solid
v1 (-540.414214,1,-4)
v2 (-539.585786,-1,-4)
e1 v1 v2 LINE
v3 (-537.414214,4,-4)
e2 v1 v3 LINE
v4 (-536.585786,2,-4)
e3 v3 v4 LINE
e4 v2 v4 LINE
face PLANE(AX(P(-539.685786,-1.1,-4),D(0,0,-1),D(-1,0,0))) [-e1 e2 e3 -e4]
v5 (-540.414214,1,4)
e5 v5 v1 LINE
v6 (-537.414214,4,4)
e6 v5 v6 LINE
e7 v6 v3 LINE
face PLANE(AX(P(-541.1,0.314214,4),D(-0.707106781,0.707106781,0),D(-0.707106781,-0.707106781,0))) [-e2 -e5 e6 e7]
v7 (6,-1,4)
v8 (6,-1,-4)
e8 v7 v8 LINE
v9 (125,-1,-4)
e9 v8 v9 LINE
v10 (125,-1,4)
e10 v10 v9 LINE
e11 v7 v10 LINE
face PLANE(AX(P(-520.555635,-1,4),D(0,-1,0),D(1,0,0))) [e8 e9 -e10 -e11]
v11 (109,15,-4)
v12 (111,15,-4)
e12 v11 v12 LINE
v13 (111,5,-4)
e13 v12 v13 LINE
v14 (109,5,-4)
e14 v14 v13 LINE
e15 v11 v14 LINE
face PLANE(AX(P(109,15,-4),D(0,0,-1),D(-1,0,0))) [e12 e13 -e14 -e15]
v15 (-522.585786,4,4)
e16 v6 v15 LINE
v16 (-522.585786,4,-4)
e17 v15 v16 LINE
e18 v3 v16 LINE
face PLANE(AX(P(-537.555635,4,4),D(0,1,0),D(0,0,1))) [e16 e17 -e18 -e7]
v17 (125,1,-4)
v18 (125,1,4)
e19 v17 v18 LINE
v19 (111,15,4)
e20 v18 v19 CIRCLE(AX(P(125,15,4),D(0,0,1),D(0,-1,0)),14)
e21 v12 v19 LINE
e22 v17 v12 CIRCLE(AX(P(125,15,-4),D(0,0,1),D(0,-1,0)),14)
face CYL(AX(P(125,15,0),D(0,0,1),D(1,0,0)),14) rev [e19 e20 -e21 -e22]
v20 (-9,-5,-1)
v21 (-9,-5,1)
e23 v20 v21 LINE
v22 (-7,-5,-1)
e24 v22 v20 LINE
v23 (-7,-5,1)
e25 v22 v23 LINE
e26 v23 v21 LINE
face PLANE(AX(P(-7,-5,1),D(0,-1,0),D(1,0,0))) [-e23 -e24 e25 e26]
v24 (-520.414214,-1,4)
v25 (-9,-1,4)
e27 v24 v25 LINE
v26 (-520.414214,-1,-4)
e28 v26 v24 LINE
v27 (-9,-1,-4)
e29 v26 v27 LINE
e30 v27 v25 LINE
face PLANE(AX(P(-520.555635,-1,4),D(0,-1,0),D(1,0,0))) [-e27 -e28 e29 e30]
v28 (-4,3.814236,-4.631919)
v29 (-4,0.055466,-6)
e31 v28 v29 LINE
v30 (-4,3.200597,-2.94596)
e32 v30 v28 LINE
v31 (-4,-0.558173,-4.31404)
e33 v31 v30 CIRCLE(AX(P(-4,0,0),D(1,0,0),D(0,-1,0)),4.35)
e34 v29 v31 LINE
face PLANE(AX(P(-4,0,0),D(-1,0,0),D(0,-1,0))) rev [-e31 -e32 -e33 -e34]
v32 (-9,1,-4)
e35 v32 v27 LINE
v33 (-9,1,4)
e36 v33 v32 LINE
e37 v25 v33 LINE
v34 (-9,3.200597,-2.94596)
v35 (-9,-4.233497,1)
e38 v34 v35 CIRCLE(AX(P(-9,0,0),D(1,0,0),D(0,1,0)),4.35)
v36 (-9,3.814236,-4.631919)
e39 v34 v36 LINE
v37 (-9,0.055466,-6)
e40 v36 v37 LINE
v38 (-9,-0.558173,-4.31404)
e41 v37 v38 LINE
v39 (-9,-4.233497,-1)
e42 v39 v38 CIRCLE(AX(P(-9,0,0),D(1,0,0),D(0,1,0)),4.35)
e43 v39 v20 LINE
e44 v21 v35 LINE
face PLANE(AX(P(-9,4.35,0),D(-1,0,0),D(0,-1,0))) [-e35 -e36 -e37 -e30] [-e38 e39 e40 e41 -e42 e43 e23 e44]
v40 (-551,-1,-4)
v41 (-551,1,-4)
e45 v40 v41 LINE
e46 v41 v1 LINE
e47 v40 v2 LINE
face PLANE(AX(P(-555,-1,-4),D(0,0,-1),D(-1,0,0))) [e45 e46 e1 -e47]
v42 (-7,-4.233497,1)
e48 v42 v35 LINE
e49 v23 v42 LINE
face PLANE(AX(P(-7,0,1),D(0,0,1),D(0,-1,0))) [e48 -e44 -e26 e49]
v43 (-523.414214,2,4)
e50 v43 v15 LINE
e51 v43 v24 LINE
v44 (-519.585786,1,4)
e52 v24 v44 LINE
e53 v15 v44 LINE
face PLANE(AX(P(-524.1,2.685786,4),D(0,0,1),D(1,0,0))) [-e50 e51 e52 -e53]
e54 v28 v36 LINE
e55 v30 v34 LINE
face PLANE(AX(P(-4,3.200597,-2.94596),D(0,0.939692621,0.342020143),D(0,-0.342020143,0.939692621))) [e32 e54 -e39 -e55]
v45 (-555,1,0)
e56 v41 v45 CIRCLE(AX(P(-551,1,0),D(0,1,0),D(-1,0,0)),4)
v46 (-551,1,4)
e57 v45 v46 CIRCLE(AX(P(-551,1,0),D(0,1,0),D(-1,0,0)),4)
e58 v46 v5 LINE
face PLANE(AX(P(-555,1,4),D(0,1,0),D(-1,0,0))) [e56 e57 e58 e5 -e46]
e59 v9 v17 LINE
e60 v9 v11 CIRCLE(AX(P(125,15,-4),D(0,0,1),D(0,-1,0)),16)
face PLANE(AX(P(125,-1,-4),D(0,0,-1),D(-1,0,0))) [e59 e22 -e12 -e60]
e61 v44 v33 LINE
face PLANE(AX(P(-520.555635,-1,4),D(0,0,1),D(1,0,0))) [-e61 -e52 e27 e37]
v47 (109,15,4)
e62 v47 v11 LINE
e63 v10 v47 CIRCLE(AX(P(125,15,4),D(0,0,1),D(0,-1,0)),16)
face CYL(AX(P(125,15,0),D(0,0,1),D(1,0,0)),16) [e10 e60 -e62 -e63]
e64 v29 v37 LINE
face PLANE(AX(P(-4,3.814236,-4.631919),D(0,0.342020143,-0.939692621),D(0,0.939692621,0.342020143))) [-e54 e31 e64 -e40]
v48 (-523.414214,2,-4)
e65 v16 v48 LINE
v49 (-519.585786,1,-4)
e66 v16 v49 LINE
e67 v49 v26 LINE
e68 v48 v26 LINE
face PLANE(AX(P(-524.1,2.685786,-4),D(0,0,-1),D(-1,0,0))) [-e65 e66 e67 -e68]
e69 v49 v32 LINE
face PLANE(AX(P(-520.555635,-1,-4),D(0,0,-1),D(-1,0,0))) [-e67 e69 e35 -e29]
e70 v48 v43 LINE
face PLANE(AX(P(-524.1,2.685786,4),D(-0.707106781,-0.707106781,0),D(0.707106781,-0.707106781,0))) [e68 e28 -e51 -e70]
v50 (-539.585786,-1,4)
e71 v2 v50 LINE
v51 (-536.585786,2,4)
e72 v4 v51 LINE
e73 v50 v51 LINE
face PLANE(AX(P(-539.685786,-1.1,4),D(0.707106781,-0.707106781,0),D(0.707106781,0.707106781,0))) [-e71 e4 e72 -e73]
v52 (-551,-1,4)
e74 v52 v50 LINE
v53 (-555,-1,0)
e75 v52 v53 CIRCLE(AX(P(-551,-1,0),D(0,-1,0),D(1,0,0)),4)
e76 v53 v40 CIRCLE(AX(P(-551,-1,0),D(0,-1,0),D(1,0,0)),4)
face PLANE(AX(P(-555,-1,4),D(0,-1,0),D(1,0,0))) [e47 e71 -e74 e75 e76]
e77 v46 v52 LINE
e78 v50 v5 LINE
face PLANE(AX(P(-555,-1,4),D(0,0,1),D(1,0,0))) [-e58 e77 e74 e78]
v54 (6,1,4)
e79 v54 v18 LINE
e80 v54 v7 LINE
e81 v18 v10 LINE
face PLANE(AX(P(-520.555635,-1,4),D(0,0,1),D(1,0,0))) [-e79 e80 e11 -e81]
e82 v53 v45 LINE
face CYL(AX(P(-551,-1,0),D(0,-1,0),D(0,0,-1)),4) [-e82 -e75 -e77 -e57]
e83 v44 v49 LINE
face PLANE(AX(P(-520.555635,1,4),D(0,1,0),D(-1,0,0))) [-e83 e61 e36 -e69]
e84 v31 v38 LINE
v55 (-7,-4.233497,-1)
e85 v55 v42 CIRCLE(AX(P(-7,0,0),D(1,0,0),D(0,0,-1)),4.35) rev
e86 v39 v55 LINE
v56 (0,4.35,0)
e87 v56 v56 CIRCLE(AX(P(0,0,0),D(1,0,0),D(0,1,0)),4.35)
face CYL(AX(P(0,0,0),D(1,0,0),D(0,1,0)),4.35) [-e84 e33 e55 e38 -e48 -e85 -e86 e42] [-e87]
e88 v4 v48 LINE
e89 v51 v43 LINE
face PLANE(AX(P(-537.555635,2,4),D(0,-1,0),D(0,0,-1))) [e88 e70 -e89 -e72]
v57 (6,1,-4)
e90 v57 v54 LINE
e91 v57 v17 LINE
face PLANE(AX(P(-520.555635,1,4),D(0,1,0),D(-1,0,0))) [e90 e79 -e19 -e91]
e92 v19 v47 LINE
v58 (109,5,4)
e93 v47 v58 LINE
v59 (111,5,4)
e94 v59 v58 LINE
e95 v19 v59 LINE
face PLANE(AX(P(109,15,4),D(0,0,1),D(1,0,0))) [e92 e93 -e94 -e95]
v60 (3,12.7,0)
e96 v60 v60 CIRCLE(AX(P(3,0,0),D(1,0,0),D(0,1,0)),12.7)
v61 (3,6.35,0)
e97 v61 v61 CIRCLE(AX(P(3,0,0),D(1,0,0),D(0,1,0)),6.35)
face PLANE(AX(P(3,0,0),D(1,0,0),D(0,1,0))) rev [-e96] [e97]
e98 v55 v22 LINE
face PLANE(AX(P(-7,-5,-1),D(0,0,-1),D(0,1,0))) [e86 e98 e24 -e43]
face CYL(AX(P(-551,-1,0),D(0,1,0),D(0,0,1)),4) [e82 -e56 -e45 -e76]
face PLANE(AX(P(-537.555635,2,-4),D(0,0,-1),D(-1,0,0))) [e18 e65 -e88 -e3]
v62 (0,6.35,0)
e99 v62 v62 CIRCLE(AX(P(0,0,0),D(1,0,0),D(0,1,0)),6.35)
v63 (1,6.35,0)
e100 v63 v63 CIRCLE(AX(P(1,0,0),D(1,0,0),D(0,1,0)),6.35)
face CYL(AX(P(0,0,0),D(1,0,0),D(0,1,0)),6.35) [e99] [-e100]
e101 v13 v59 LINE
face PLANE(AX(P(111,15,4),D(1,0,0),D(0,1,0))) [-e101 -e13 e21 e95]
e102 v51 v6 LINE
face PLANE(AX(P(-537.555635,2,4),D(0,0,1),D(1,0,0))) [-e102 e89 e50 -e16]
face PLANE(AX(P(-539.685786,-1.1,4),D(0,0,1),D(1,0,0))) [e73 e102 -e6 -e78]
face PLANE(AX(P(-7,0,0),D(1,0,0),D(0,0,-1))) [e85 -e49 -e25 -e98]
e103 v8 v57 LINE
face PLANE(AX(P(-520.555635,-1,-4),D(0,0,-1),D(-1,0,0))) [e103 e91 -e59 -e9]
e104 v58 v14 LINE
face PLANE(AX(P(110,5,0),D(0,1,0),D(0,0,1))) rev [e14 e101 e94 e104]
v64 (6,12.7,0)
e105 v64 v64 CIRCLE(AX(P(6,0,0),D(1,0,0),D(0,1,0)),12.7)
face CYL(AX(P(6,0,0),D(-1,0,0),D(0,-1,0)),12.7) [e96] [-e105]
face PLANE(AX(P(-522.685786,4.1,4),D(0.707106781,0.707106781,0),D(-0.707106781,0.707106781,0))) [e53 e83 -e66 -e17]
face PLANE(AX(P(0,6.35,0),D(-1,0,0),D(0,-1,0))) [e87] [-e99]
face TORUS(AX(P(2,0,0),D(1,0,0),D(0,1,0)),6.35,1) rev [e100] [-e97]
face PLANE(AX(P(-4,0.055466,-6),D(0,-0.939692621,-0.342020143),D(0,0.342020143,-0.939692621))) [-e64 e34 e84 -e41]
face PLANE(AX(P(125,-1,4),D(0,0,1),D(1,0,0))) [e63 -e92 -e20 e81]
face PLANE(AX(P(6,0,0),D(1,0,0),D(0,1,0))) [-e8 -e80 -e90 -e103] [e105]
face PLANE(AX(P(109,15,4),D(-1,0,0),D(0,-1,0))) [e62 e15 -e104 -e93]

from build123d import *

# Parameters (mm, degrees)
SZKIC6_R                    = 12.7
DODANIE_WYCI_GNI_CIE3_DEPTH = 3
SZKIC7_W                    = 8
SZKIC7_H                    = 2
ZAOKR_GLENIE3_R             = 4
SZKIC13_W                   = 2
SZKIC13_H                   = 5
DODANIE_WYCI_GNI_CIE5_DEPTH = 2
DODANIE_WYCI_GNI_CIE6_START = -5
DODANIE_WYCI_GNI_CIE6_DEPTH = 5


with BuildPart() as part:
    # Szkic5 → Obrót1 (revolve)
    with BuildSketch(Plane.XY):
        with BuildLine():
            Line((0, 6.35), (1, 6.35))
            ThreePointArc((1, 6.35), (2, 5.35), (3, 6.35))
            Line((3, 6.35), (3, 0))
            Line((3, 0), (0, 0))
            Line((0, 0), (-9, 0))
            Line((-9, 0), (-9, 4.35))
            Line((-9, 4.35), (0, 4.35))
            Line((0, 4.35), (0, 6.35))
        make_face()
    revolve(axis=Axis((0, 0, 0), (-1, 0, 0)))

    # Szkic6 → Dodanie-wyciągnięcie3 (add)
    with BuildSketch(Plane(origin=(3, 0, 0), x_dir=(0, 0, -1), z_dir=(1, 0, 0))):
        with Locations(Location((0, 0, 0), (0, 0, 90))):
            Circle(SZKIC6_R)
    extrude(amount=DODANIE_WYCI_GNI_CIE3_DEPTH)

    # Wyciągnięcie po ścieżce1: sweep along a path in Szkic1
    with BuildLine(Plane.XY) as wyci_gni_cie_po_cie_ce1_path:
        Line((110, 5), (110, 15))
        ThreePointArc((110, 15), (135.606601718, 25.606601718), (125, 0))
        Line((125, 0), (0, 0))
        Line((0, 0), (-520, 0))
        Line((-520, 0), (-523, 3))
        Line((-523, 3), (-537, 3))
        Line((-537, 3), (-540, 0))
        Line((-540, 0), (-555, 0))
    # Szkic7 → Wyciągnięcie po ścieżce1 (sweep)
    with BuildSketch(Plane(origin=(0, 0, 0), x_dir=(0, 0, -1), z_dir=(1, 0, 0))):
        Rectangle(SZKIC7_W, SZKIC7_H)
    sweep(path=wyci_gni_cie_po_cie_ce1_path.line, transition=Transition.RIGHT)

    # Zaokrąglenie3
    zaokr_glenie3_edges = [part.edges().sort_by_distance(p)[0] for p in [
        (-555, 0, -4),
        (-555, 0, 4),
    ]]
    fillet(zaokr_glenie3_edges, radius=ZAOKR_GLENIE3_R - 0.0001)  # a hair under: the kernel refuses the full size

    # Szkic13 → Dodanie-wyciągnięcie5 (add)
    with BuildSketch(Plane.ZY.offset(9)):
        with Locations((0, -2.5)):
            Rectangle(SZKIC13_W, SZKIC13_H)
    extrude(amount=-DODANIE_WYCI_GNI_CIE5_DEPTH)

    # Szkic14 → Dodanie-wyciągnięcie6 (add)
    with BuildSketch(Plane.ZY.offset(9).offset(DODANIE_WYCI_GNI_CIE6_START)):
        with BuildLine():
            Line((-2.94595959, 3.200597147), (-4.631919427, 3.814236344))
            Line((-4.631919427, 3.814236344), (-6, 0.055465861))
            Line((-6, 0.055465861), (-4.314040163, -0.558173336))
            ThreePointArc((-4.314040163, -0.558173336), (-4.0876629, 1.487787623), (-2.94595959, 3.200597147))
        make_face()
    extrude(amount=DODANIE_WYCI_GNI_CIE6_DEPTH)


solid = part.part
